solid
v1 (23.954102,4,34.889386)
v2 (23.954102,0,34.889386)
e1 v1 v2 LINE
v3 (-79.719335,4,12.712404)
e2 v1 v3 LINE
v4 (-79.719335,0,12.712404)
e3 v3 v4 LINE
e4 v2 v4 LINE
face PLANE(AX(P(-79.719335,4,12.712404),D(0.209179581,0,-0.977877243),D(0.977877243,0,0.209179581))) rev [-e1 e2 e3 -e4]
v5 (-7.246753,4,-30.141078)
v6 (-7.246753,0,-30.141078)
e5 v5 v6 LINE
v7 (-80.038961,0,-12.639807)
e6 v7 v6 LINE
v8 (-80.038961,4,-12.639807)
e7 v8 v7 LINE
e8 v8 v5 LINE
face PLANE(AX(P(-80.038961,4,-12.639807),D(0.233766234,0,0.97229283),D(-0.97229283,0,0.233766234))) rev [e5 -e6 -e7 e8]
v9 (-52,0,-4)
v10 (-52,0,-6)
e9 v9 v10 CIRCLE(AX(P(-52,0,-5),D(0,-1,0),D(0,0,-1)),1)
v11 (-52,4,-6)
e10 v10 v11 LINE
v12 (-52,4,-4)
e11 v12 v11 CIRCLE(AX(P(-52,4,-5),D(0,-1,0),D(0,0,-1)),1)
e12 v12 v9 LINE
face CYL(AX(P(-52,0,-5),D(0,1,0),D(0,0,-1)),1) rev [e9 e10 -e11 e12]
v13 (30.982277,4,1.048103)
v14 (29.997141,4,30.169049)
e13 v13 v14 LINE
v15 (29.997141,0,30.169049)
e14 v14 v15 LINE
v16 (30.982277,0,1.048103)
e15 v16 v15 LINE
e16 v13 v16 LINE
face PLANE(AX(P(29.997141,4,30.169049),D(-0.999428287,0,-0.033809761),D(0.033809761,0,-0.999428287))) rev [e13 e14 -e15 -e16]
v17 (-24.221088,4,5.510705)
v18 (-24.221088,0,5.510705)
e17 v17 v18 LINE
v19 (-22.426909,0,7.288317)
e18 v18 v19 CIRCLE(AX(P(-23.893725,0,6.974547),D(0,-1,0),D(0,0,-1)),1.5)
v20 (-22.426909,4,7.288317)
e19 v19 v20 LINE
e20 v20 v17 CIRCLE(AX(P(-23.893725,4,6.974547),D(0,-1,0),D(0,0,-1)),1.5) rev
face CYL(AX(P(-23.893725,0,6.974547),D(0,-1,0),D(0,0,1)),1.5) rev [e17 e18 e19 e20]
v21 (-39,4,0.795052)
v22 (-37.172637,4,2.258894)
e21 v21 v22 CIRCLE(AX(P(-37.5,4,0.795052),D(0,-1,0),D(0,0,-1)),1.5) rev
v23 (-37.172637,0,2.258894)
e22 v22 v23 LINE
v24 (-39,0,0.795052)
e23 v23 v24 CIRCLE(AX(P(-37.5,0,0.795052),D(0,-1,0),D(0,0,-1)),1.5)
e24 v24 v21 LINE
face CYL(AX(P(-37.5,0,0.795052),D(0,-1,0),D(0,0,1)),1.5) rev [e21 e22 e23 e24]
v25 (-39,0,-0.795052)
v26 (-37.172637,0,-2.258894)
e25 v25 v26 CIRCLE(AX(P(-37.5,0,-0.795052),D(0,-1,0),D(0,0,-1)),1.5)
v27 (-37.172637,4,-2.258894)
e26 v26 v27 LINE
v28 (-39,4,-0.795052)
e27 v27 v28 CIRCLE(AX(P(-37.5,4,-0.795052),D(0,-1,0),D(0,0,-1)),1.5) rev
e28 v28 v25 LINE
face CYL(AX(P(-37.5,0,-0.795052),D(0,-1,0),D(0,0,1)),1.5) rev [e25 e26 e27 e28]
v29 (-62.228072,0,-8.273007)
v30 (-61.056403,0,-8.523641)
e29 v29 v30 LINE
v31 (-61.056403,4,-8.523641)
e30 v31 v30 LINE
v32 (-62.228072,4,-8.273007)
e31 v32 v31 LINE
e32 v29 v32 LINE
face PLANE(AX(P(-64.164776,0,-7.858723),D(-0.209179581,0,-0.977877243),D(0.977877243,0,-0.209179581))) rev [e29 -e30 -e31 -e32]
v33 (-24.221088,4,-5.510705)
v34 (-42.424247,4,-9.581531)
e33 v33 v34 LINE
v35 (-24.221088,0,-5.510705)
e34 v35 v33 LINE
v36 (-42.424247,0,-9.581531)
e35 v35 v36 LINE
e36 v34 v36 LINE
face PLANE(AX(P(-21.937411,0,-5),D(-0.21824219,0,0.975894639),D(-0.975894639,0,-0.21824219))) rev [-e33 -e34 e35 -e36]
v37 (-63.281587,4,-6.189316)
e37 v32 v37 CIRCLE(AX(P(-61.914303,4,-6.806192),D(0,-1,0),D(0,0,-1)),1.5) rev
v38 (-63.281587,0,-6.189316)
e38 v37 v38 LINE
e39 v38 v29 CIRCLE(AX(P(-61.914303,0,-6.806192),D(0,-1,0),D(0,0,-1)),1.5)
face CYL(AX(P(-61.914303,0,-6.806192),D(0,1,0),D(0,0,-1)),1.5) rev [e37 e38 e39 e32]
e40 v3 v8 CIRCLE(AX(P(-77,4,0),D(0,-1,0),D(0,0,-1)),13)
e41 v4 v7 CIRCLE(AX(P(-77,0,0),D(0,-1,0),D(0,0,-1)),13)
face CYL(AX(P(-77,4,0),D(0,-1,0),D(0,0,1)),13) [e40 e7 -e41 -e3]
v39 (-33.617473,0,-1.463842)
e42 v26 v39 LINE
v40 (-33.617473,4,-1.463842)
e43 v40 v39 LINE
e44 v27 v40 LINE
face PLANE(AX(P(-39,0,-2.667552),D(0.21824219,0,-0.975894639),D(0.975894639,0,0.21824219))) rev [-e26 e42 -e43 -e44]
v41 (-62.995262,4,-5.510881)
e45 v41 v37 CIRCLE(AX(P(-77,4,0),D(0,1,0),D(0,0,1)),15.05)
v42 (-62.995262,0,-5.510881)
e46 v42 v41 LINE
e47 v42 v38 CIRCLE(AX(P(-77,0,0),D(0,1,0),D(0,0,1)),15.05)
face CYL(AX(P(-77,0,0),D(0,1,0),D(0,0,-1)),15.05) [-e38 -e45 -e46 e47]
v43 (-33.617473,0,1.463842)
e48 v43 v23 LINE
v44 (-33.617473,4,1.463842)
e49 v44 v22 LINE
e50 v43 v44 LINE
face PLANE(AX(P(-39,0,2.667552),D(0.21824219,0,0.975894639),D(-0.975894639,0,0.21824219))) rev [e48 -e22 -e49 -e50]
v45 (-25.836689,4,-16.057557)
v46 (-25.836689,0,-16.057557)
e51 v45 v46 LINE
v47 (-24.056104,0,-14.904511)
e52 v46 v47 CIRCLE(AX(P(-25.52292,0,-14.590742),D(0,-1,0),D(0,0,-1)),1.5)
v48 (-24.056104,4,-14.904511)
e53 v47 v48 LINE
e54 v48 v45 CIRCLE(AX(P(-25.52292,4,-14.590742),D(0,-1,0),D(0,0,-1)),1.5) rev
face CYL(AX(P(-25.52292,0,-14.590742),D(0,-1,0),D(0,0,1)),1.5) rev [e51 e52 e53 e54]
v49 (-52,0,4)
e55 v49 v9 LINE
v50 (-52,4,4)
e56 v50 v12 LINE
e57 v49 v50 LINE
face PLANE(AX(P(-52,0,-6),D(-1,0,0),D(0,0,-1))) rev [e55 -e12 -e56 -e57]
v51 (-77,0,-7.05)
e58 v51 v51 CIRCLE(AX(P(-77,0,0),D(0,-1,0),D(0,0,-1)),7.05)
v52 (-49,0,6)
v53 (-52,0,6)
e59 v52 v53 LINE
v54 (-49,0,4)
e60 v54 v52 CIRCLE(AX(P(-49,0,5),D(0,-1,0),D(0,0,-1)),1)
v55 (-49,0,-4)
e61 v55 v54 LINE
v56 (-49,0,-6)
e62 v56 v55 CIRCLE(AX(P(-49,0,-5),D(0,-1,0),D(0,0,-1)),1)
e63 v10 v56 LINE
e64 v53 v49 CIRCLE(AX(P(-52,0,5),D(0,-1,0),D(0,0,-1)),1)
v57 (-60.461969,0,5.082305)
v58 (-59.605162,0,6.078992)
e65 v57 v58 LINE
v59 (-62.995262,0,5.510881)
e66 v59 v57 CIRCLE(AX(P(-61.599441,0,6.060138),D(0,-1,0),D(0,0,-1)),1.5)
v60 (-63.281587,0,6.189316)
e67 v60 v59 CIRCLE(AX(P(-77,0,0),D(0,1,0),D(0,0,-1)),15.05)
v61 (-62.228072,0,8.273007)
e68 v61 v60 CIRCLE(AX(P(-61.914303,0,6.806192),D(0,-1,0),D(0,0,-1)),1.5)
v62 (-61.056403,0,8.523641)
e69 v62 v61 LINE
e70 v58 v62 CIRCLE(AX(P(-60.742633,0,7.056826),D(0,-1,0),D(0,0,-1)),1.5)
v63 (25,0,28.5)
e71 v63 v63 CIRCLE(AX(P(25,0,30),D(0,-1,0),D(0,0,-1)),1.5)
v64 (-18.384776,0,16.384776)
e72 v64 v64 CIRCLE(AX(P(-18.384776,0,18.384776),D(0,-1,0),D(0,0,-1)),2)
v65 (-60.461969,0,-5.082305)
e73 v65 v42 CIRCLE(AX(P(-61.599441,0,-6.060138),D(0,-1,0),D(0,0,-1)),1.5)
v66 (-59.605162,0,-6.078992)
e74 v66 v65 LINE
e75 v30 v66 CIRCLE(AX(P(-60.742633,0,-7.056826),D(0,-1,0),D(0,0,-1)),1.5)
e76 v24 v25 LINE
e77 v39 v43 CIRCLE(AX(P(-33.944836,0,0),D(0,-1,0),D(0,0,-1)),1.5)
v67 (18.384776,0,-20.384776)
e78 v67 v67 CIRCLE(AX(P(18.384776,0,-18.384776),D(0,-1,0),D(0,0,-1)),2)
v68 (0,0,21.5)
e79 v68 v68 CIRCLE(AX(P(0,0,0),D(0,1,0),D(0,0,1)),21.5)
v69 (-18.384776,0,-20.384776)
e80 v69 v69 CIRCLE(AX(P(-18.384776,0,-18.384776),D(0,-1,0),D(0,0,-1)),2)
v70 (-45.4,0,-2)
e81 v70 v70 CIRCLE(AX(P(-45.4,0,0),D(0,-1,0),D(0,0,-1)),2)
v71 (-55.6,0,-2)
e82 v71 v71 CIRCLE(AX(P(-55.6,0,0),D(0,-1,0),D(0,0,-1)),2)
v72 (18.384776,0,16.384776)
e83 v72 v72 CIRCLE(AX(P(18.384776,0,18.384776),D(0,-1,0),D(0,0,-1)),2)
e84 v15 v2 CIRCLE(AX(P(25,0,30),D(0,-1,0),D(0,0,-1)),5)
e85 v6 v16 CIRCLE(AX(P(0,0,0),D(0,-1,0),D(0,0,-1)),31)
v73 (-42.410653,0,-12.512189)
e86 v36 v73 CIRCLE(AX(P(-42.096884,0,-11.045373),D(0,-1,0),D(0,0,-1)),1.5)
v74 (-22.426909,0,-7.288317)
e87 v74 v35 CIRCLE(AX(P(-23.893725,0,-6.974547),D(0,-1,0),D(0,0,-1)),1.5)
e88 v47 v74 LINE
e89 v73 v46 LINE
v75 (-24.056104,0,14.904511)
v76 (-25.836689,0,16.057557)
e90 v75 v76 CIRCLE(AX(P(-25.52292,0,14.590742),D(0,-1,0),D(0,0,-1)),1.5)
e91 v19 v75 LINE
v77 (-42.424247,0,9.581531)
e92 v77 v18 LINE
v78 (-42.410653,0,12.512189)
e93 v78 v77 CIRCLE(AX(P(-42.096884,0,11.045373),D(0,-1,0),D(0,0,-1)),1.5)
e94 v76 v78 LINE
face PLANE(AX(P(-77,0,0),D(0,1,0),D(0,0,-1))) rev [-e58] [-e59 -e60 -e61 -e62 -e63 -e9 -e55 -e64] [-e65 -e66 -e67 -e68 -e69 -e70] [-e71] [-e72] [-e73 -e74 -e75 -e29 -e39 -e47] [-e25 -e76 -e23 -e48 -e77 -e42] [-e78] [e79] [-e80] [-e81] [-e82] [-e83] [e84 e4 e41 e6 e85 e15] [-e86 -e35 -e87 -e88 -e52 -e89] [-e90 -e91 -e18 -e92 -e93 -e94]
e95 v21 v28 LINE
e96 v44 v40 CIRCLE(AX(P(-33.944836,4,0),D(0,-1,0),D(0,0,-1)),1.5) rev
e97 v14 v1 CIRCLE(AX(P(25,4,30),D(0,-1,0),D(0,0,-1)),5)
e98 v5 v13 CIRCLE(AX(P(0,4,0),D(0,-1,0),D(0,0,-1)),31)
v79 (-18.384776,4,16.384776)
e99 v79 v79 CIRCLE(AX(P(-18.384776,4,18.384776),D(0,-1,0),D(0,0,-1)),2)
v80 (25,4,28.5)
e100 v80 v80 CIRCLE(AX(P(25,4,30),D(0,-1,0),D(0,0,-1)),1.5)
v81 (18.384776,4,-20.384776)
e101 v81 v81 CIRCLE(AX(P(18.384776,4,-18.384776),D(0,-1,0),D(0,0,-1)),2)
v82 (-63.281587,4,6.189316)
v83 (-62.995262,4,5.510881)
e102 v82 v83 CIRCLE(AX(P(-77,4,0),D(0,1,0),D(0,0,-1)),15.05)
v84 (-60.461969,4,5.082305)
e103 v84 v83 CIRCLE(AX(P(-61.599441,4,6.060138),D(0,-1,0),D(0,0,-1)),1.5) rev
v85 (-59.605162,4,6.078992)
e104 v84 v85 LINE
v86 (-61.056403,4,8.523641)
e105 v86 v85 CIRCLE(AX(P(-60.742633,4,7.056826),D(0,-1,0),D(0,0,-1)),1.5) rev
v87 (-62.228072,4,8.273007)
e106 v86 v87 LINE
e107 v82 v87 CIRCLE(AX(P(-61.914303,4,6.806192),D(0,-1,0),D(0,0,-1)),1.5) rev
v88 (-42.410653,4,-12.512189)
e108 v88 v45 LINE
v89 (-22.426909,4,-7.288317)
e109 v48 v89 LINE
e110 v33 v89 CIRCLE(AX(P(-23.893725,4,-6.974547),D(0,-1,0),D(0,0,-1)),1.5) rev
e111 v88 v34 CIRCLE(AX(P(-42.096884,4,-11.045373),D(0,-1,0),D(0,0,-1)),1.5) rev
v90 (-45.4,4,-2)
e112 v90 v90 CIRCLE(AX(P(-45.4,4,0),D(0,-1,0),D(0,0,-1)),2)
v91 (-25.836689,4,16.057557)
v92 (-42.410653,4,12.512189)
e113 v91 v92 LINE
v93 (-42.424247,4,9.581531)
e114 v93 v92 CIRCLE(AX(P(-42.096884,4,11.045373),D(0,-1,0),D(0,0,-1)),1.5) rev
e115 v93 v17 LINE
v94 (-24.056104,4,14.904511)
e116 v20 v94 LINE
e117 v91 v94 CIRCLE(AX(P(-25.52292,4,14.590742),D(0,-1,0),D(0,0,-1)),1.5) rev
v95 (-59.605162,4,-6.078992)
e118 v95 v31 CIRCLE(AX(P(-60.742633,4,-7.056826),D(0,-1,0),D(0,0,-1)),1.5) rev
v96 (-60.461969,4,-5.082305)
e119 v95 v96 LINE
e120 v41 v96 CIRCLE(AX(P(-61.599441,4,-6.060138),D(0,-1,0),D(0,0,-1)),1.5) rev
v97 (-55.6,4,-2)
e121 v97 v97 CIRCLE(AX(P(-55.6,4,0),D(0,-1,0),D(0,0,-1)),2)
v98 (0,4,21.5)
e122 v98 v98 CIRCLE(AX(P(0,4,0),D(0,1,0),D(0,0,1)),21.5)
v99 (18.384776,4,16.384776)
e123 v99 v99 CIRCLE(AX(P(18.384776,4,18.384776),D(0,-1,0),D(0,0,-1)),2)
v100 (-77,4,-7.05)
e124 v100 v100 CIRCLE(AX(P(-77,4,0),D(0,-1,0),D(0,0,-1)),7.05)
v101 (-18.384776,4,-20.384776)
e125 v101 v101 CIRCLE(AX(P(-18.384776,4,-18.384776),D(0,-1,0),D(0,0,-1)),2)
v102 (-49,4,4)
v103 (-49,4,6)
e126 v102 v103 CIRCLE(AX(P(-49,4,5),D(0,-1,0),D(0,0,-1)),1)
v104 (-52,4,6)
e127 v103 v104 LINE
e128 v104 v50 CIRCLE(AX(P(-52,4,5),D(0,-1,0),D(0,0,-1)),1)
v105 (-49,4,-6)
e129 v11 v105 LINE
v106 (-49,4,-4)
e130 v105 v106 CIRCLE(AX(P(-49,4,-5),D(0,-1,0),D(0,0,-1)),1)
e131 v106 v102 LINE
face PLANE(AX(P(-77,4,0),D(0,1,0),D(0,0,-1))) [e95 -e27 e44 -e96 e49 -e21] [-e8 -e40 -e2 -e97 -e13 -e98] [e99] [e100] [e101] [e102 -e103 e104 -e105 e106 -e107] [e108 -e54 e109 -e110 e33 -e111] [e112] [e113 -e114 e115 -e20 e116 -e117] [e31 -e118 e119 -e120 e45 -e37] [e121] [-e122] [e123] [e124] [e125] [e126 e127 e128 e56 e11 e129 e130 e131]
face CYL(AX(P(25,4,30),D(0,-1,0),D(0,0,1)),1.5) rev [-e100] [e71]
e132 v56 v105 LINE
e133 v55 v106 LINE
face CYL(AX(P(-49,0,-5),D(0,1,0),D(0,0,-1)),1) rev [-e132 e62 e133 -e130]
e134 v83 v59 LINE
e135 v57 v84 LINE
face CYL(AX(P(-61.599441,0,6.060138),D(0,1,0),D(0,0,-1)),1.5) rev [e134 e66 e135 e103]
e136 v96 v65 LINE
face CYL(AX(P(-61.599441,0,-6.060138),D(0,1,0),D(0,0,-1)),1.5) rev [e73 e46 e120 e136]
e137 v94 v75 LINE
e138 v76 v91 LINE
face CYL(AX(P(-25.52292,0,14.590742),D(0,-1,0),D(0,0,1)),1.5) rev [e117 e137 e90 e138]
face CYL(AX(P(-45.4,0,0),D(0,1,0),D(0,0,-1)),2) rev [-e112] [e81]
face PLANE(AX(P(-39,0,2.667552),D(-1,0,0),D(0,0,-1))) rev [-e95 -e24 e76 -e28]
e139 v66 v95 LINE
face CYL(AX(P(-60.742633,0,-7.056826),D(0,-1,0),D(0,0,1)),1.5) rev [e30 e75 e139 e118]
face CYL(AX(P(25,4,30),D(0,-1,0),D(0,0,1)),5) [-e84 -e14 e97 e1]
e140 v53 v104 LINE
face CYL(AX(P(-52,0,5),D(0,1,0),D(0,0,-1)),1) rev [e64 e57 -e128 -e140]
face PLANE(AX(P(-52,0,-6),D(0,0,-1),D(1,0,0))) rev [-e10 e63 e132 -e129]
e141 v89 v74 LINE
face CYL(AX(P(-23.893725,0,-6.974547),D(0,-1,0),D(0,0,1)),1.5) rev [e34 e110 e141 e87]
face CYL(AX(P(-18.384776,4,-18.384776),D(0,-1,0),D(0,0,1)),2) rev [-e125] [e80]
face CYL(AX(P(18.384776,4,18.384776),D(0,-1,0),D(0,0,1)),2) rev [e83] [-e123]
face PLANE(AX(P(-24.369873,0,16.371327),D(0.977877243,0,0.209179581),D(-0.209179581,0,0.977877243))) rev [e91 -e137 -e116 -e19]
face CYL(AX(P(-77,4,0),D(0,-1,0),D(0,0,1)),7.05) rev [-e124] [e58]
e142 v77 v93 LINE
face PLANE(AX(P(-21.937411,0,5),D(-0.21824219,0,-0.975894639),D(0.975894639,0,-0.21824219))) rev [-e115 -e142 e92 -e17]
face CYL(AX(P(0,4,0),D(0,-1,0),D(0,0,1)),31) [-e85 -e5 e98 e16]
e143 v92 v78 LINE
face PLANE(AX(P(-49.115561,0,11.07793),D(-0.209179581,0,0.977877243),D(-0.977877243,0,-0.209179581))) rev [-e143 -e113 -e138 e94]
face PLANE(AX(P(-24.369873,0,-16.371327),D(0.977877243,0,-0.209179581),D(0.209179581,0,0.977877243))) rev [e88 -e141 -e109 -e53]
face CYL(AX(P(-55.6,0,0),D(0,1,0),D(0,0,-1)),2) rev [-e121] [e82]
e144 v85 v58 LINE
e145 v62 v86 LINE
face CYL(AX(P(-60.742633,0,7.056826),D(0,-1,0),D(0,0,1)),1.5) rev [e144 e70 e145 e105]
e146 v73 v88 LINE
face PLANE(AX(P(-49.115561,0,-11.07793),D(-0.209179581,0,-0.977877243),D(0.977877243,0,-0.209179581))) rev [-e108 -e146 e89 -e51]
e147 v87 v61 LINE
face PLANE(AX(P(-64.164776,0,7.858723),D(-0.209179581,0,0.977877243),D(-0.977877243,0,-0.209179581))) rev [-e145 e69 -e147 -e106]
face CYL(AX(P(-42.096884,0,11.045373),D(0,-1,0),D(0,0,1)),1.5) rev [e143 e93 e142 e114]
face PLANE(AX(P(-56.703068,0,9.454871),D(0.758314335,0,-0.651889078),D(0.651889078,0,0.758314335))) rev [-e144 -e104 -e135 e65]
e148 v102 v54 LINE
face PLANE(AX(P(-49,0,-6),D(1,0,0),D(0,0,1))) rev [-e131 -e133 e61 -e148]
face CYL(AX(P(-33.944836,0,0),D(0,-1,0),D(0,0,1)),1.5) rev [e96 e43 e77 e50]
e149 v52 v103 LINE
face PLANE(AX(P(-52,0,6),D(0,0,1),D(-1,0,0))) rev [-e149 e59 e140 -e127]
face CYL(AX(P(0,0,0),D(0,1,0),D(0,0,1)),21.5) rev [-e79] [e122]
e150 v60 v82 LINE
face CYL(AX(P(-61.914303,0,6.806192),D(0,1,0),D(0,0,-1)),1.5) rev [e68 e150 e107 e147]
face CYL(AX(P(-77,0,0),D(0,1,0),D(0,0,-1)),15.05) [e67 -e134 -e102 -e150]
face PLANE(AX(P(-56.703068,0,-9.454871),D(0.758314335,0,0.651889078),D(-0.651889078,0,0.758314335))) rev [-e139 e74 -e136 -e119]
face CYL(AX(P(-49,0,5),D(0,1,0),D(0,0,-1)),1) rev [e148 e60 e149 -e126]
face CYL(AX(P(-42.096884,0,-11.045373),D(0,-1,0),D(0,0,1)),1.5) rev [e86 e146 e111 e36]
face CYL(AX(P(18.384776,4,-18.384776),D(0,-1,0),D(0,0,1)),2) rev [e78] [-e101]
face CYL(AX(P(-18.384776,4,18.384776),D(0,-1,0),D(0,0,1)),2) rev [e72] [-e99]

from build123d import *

# Parameters (mm, degrees)
OTHER_194_OUTLINE_R   = 1.5
OTHER_194_OUTLINE_R_2 = 2
OTHER_194_OUTLINE_R_3 = 7.05
OTHER_194_OUTLINE_R_4 = 13
OTHER_194_DEPTH       = 4
SKETCH_2_R            = 21.5
CUT_EXTRUDE_1_DEPTH   = 97.648848933


# Read off the part's stored shape, not the designer's step: the other step
with BuildPart() as part:
    # Other 194 outline → Other 194 (new body)
    with BuildSketch(Plane(origin=(0, 0, 0), x_dir=(1, 0, 0), z_dir=(0, 1, 0))):
        with BuildLine():
            ThreePointArc((-80.038961039, 12.639806795), (-89.998966964, -0.163883698), (-79.719334557, -12.712404162))
            Line((-79.719334557, -12.712404162), (23.954102093, -34.889386216))
            ThreePointArc((23.954102093, -34.889386216), (28.077901504, -33.940370837), (29.997141433, -30.169048806))
            Line((29.997141433, -30.169048806), (30.982276884, -1.048102596))
            ThreePointArc((30.982276884, -1.048102596), (19.596811299, 24.020095481), (-7.246753247, 30.141077741))
            Line((-7.246753247, 30.141077741), (-80.038961039, 12.639806795))
        make_face()
        with BuildLine():
            ThreePointArc((-62.228072273, -8.273007388), (-63.252931738, -7.483002306), (-63.281586626, -6.189316158))
            ThreePointArc((-63.281586626, -6.189316158), (-63.134274256, -5.851850099), (-62.995261901, -5.510881125))
            ThreePointArc((-62.995261901, -5.510881125), (-61.849651838, -4.581154117), (-60.461969326, -5.082304763))
            Line((-60.461969326, -5.082304763), (-59.605161669, -6.078992007))
            ThreePointArc((-59.605161669, -6.078992007), (-59.452788579, -7.822528522), (-61.056402543, -8.523641489))
            Line((-61.056402543, -8.523641489), (-62.228072273, -8.273007388))
        make_face(mode=Mode.SUBTRACT)
        with BuildLine():
            Line((-25.836688979, -16.057557417), (-42.41065304, -12.512189235))
            ThreePointArc((-42.41065304, -12.512189235), (-43.596867532, -11.052331075), (-42.424246953, -9.581531412))
            Line((-42.424246953, -9.581531412), (-24.221088321, -5.510705486))
            ThreePointArc((-24.221088321, -5.510705486), (-22.837996114, -5.908978844), (-22.426909172, -7.288316817))
            Line((-22.426909172, -7.288316817), (-24.056103742, -14.904510924))
            ThreePointArc((-24.056103742, -14.904510924), (-24.707592613, -15.849805447), (-25.836688979, -16.057557417))
        make_face(mode=Mode.SUBTRACT)
        with Locations((25, -30)):
            Circle(OTHER_194_OUTLINE_R, mode=Mode.SUBTRACT)
        with Locations((-18.384776311, -18.384776311)):
            Circle(OTHER_194_OUTLINE_R_2, mode=Mode.SUBTRACT)
        with Locations((-12.374368671, -12.374368671)):
            Circle(OTHER_194_OUTLINE_R_2, mode=Mode.SUBTRACT)
        with Locations((12.374368671, -12.374368671)):
            Circle(OTHER_194_OUTLINE_R_2, mode=Mode.SUBTRACT)
        with Locations((18.384776311, -18.384776311)):
            Circle(OTHER_194_OUTLINE_R_2, mode=Mode.SUBTRACT)
        with Locations((-77, 0)):
            Circle(OTHER_194_OUTLINE_R_3, mode=Mode.SUBTRACT)
        with BuildLine():
            ThreePointArc((-60.461969326, 5.082304763), (-61.849651838, 4.581154117), (-62.995261901, 5.510881125))
            ThreePointArc((-62.995261901, 5.510881125), (-63.134274256, 5.851850099), (-63.281586626, 6.189316158))
            ThreePointArc((-63.281586626, 6.189316158), (-63.252931738, 7.483002306), (-62.228072273, 8.273007388))
            Line((-62.228072273, 8.273007388), (-61.056402543, 8.523641489))
            ThreePointArc((-61.056402543, 8.523641489), (-59.452788579, 7.822528522), (-59.605161669, 6.078992007))
            Line((-59.605161669, 6.078992007), (-60.461969326, 5.082304763))
        make_face(mode=Mode.SUBTRACT)
        with Locations((-55.6, 0)):
            Circle(OTHER_194_OUTLINE_R_2, mode=Mode.SUBTRACT)
        with BuildLine():
            Line((-49, 4), (-49, -4))
            ThreePointArc((-49, -4), (-48, -5), (-49, -6))
            Line((-49, -6), (-52, -6))
            ThreePointArc((-52, -6), (-53, -5), (-52, -4))
            Line((-52, -4), (-52, 4))
            ThreePointArc((-52, 4), (-53, 5), (-52, 6))
            Line((-52, 6), (-49, 6))
            ThreePointArc((-49, 6), (-48, 5), (-49, 4))
        make_face(mode=Mode.SUBTRACT)
        with Locations((-45.4, 0)):
            Circle(OTHER_194_OUTLINE_R_2, mode=Mode.SUBTRACT)
        with BuildLine():
            Line((-39, -0.79505171), (-39, 0.79505171))
            ThreePointArc((-39, 0.79505171), (-38.437804637, 1.965744865), (-37.172636716, 2.258893669))
            Line((-37.172636716, 2.258893669), (-33.617473054, 1.463841959))
            ThreePointArc((-33.617473054, 1.463841959), (-32.444836338, 0), (-33.617473054, -1.463841959))
            Line((-33.617473054, -1.463841959), (-37.172636716, -2.258893669))
            ThreePointArc((-37.172636716, -2.258893669), (-38.437804637, -1.965744865), (-39, -0.79505171))
        make_face(mode=Mode.SUBTRACT)
        with BuildLine():
            Line((-24.221088321, 5.510705486), (-42.424246953, 9.581531412))
            ThreePointArc((-42.424246953, 9.581531412), (-43.596867532, 11.052331075), (-42.41065304, 12.512189235))
            Line((-42.41065304, 12.512189235), (-25.836688979, 16.057557417))
            ThreePointArc((-25.836688979, 16.057557417), (-24.707592613, 15.849805447), (-24.056103742, 14.904510924))
            Line((-24.056103742, 14.904510924), (-22.426909172, 7.288316817))
            ThreePointArc((-22.426909172, 7.288316817), (-22.837996114, 5.908978844), (-24.221088321, 5.510705486))
        make_face(mode=Mode.SUBTRACT)
        Circle(OTHER_194_OUTLINE_R_4, mode=Mode.SUBTRACT)
        with Locations((-12.374368671, 12.374368671)):
            Circle(OTHER_194_OUTLINE_R_2, mode=Mode.SUBTRACT)
        with Locations((12.374368671, 12.374368671)):
            Circle(OTHER_194_OUTLINE_R_2, mode=Mode.SUBTRACT)
        with Locations((-18.384776311, 18.384776311)):
            Circle(OTHER_194_OUTLINE_R_2, mode=Mode.SUBTRACT)
        with Locations((18.384776311, 18.384776311)):
            Circle(OTHER_194_OUTLINE_R_2, mode=Mode.SUBTRACT)
    extrude(amount=OTHER_194_DEPTH)

    # Sketch 2 → Cut-Extrude 1 (cut, through all)
    with BuildSketch(Plane(origin=(0, 4, 0), x_dir=(1, 0, 0), z_dir=(0, 1, 0))):
        with Locations(Location((0, 0, 0), (0, 0, 270))):
            Circle(SKETCH_2_R)
    extrude(amount=-CUT_EXTRUDE_1_DEPTH, mode=Mode.SUBTRACT)


solid = part.part
